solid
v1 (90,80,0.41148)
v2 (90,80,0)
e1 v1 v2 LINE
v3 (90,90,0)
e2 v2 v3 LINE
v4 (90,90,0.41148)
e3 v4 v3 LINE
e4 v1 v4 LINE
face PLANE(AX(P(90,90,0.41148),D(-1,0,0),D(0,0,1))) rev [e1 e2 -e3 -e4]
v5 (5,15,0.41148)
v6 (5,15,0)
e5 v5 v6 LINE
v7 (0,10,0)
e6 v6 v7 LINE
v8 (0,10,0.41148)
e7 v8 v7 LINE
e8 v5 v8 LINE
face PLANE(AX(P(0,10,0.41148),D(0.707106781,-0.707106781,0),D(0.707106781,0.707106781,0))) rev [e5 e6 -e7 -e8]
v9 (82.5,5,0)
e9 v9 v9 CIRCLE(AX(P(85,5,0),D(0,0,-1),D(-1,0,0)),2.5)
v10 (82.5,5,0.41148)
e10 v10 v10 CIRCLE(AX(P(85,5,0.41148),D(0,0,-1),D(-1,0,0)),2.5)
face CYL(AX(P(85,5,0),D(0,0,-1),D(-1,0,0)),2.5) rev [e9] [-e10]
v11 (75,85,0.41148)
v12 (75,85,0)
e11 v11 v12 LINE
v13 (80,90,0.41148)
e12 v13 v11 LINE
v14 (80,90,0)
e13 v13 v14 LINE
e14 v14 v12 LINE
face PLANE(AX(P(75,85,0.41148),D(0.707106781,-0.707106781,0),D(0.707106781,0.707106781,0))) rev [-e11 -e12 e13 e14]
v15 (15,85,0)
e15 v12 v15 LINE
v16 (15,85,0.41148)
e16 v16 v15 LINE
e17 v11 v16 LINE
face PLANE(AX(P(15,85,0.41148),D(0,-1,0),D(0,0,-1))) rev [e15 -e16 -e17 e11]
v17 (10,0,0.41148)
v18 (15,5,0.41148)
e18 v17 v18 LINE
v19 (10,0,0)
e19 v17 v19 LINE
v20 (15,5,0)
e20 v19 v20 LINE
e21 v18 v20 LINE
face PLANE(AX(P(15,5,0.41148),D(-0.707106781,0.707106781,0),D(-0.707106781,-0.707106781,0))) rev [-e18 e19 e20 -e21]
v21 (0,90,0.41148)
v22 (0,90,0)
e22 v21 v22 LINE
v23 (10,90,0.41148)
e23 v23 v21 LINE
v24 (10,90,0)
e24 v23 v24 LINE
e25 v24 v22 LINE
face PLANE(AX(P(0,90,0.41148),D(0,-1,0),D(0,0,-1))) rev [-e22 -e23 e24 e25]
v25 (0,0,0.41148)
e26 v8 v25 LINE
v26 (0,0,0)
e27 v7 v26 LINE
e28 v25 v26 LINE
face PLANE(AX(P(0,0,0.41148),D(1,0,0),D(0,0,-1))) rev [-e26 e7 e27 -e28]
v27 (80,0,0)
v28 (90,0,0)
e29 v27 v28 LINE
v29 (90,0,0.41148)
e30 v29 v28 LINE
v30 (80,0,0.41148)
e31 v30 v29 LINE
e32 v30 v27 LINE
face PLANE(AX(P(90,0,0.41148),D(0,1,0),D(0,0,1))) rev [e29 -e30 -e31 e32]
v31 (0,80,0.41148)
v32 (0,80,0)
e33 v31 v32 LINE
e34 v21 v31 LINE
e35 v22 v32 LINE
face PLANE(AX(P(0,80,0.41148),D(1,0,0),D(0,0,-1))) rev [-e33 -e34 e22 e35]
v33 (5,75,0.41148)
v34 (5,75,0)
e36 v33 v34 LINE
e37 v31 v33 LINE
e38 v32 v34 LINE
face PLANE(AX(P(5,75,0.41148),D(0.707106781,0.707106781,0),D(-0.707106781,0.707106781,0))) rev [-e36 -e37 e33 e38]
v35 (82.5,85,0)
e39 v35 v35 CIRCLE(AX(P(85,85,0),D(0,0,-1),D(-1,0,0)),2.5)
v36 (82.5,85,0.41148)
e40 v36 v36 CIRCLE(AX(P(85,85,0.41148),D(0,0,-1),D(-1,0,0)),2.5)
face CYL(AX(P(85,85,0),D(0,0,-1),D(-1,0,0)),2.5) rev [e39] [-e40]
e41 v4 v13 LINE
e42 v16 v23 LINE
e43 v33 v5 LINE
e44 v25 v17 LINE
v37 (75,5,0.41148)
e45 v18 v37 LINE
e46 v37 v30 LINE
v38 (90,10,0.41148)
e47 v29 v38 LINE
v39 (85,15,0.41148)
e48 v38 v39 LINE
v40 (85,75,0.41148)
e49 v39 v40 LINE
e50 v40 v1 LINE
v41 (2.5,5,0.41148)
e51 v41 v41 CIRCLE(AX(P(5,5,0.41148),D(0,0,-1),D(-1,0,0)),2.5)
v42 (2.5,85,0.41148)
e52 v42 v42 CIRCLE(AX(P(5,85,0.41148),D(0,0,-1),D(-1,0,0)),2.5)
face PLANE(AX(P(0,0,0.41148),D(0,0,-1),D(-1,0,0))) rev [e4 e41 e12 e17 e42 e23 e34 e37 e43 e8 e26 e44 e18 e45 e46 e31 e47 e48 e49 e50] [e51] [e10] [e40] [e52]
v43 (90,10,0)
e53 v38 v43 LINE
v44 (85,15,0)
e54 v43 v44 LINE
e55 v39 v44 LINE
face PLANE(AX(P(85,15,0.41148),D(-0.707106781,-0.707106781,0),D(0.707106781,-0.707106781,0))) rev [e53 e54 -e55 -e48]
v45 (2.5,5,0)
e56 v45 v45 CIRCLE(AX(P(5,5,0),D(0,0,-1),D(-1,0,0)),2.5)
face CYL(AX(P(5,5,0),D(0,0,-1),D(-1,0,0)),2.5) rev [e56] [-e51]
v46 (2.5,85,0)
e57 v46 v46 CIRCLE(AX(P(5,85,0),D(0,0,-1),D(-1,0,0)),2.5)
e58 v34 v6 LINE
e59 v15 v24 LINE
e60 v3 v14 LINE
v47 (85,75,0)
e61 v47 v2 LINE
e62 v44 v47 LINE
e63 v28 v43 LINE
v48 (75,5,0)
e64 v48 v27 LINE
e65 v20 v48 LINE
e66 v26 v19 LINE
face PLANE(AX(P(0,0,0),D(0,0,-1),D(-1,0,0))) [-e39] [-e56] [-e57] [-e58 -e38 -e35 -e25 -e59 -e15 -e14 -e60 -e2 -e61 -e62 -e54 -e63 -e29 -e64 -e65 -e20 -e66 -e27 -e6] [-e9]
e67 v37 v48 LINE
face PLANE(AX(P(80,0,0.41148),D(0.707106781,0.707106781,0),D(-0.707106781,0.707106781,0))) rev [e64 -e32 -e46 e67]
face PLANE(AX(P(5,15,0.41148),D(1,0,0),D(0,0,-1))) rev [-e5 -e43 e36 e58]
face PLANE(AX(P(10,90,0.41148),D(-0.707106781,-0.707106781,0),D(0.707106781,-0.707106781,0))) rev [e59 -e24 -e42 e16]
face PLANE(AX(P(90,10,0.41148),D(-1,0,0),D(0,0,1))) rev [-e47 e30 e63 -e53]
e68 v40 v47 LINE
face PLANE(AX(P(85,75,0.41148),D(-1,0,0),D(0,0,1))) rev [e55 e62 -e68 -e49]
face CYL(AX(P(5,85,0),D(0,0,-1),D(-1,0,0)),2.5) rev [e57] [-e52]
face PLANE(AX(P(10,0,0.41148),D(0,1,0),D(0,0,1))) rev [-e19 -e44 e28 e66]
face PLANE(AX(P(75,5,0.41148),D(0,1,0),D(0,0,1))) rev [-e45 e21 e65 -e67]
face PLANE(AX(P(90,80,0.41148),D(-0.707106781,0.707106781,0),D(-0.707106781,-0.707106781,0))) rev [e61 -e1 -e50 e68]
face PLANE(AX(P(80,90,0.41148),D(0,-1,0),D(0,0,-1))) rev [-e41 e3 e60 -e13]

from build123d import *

# Parameters (mm, degrees)
BOARD_DEPTH               = 0.41148
OTW_R_1_0_228_1_OUTLINE_R = 2.5
OTW_R_1_0_228_1_DEPTH     = 0.41148
OTW_R_1_0_228_2_OUTLINE_R = 2.5
OTW_R_1_0_228_2_DEPTH     = 0.41148
OTW_R_1_0_228_3_OUTLINE_R = 2.5
OTW_R_1_0_228_3_DEPTH     = 0.41148
OTW_R_1_0_228_4_OUTLINE_R = 2.5
OTW_R_1_0_228_4_DEPTH     = 0.41148


# Read off the part's stored shape, not the designer's step: Otwór #1 (0.228)1, Otwór #1 (0.228)2, Otwór #1 (0.228)3, Otwór #1 (0.228)4
with BuildPart() as part:
    # Szkic1 → Board (new body)
    with BuildSketch(Plane.XY):
        Polygon((90, 80), (85, 75), (85, 15), (90, 10), (90, 0), (80, 0), (75, 5), (15, 5), (10, 0), (0, 0), (0, 10), (5, 15), (5, 75), (0, 80), (0, 90), (10, 90), (15, 85), (75, 85), (80, 90), (90, 90), align=None)
    extrude(amount=BOARD_DEPTH)

    # Otwór #1 (0.228)1 outline → Otwór #1 (0.228)1 (cut)
    with BuildSketch(Plane.XY):
        with Locations((85, 85)):
            Circle(OTW_R_1_0_228_1_OUTLINE_R)
    extrude(amount=OTW_R_1_0_228_1_DEPTH, mode=Mode.SUBTRACT)

    # Otwór #1 (0.228)2 outline → Otwór #1 (0.228)2 (cut)
    with BuildSketch(Plane.XY):
        with Locations((5, 85)):
            Circle(OTW_R_1_0_228_2_OUTLINE_R)
    extrude(amount=OTW_R_1_0_228_2_DEPTH, mode=Mode.SUBTRACT)

    # Otwór #1 (0.228)3 outline → Otwór #1 (0.228)3 (cut)
    with BuildSketch(Plane.XY):
        with Locations((85, 5)):
            Circle(OTW_R_1_0_228_3_OUTLINE_R)
    extrude(amount=OTW_R_1_0_228_3_DEPTH, mode=Mode.SUBTRACT)

    # Otwór #1 (0.228)4 outline → Otwór #1 (0.228)4 (cut)
    with BuildSketch(Plane.XY):
        with Locations((5, 5)):
            Circle(OTW_R_1_0_228_4_OUTLINE_R)
    extrude(amount=OTW_R_1_0_228_4_DEPTH, mode=Mode.SUBTRACT)


solid = part.part
